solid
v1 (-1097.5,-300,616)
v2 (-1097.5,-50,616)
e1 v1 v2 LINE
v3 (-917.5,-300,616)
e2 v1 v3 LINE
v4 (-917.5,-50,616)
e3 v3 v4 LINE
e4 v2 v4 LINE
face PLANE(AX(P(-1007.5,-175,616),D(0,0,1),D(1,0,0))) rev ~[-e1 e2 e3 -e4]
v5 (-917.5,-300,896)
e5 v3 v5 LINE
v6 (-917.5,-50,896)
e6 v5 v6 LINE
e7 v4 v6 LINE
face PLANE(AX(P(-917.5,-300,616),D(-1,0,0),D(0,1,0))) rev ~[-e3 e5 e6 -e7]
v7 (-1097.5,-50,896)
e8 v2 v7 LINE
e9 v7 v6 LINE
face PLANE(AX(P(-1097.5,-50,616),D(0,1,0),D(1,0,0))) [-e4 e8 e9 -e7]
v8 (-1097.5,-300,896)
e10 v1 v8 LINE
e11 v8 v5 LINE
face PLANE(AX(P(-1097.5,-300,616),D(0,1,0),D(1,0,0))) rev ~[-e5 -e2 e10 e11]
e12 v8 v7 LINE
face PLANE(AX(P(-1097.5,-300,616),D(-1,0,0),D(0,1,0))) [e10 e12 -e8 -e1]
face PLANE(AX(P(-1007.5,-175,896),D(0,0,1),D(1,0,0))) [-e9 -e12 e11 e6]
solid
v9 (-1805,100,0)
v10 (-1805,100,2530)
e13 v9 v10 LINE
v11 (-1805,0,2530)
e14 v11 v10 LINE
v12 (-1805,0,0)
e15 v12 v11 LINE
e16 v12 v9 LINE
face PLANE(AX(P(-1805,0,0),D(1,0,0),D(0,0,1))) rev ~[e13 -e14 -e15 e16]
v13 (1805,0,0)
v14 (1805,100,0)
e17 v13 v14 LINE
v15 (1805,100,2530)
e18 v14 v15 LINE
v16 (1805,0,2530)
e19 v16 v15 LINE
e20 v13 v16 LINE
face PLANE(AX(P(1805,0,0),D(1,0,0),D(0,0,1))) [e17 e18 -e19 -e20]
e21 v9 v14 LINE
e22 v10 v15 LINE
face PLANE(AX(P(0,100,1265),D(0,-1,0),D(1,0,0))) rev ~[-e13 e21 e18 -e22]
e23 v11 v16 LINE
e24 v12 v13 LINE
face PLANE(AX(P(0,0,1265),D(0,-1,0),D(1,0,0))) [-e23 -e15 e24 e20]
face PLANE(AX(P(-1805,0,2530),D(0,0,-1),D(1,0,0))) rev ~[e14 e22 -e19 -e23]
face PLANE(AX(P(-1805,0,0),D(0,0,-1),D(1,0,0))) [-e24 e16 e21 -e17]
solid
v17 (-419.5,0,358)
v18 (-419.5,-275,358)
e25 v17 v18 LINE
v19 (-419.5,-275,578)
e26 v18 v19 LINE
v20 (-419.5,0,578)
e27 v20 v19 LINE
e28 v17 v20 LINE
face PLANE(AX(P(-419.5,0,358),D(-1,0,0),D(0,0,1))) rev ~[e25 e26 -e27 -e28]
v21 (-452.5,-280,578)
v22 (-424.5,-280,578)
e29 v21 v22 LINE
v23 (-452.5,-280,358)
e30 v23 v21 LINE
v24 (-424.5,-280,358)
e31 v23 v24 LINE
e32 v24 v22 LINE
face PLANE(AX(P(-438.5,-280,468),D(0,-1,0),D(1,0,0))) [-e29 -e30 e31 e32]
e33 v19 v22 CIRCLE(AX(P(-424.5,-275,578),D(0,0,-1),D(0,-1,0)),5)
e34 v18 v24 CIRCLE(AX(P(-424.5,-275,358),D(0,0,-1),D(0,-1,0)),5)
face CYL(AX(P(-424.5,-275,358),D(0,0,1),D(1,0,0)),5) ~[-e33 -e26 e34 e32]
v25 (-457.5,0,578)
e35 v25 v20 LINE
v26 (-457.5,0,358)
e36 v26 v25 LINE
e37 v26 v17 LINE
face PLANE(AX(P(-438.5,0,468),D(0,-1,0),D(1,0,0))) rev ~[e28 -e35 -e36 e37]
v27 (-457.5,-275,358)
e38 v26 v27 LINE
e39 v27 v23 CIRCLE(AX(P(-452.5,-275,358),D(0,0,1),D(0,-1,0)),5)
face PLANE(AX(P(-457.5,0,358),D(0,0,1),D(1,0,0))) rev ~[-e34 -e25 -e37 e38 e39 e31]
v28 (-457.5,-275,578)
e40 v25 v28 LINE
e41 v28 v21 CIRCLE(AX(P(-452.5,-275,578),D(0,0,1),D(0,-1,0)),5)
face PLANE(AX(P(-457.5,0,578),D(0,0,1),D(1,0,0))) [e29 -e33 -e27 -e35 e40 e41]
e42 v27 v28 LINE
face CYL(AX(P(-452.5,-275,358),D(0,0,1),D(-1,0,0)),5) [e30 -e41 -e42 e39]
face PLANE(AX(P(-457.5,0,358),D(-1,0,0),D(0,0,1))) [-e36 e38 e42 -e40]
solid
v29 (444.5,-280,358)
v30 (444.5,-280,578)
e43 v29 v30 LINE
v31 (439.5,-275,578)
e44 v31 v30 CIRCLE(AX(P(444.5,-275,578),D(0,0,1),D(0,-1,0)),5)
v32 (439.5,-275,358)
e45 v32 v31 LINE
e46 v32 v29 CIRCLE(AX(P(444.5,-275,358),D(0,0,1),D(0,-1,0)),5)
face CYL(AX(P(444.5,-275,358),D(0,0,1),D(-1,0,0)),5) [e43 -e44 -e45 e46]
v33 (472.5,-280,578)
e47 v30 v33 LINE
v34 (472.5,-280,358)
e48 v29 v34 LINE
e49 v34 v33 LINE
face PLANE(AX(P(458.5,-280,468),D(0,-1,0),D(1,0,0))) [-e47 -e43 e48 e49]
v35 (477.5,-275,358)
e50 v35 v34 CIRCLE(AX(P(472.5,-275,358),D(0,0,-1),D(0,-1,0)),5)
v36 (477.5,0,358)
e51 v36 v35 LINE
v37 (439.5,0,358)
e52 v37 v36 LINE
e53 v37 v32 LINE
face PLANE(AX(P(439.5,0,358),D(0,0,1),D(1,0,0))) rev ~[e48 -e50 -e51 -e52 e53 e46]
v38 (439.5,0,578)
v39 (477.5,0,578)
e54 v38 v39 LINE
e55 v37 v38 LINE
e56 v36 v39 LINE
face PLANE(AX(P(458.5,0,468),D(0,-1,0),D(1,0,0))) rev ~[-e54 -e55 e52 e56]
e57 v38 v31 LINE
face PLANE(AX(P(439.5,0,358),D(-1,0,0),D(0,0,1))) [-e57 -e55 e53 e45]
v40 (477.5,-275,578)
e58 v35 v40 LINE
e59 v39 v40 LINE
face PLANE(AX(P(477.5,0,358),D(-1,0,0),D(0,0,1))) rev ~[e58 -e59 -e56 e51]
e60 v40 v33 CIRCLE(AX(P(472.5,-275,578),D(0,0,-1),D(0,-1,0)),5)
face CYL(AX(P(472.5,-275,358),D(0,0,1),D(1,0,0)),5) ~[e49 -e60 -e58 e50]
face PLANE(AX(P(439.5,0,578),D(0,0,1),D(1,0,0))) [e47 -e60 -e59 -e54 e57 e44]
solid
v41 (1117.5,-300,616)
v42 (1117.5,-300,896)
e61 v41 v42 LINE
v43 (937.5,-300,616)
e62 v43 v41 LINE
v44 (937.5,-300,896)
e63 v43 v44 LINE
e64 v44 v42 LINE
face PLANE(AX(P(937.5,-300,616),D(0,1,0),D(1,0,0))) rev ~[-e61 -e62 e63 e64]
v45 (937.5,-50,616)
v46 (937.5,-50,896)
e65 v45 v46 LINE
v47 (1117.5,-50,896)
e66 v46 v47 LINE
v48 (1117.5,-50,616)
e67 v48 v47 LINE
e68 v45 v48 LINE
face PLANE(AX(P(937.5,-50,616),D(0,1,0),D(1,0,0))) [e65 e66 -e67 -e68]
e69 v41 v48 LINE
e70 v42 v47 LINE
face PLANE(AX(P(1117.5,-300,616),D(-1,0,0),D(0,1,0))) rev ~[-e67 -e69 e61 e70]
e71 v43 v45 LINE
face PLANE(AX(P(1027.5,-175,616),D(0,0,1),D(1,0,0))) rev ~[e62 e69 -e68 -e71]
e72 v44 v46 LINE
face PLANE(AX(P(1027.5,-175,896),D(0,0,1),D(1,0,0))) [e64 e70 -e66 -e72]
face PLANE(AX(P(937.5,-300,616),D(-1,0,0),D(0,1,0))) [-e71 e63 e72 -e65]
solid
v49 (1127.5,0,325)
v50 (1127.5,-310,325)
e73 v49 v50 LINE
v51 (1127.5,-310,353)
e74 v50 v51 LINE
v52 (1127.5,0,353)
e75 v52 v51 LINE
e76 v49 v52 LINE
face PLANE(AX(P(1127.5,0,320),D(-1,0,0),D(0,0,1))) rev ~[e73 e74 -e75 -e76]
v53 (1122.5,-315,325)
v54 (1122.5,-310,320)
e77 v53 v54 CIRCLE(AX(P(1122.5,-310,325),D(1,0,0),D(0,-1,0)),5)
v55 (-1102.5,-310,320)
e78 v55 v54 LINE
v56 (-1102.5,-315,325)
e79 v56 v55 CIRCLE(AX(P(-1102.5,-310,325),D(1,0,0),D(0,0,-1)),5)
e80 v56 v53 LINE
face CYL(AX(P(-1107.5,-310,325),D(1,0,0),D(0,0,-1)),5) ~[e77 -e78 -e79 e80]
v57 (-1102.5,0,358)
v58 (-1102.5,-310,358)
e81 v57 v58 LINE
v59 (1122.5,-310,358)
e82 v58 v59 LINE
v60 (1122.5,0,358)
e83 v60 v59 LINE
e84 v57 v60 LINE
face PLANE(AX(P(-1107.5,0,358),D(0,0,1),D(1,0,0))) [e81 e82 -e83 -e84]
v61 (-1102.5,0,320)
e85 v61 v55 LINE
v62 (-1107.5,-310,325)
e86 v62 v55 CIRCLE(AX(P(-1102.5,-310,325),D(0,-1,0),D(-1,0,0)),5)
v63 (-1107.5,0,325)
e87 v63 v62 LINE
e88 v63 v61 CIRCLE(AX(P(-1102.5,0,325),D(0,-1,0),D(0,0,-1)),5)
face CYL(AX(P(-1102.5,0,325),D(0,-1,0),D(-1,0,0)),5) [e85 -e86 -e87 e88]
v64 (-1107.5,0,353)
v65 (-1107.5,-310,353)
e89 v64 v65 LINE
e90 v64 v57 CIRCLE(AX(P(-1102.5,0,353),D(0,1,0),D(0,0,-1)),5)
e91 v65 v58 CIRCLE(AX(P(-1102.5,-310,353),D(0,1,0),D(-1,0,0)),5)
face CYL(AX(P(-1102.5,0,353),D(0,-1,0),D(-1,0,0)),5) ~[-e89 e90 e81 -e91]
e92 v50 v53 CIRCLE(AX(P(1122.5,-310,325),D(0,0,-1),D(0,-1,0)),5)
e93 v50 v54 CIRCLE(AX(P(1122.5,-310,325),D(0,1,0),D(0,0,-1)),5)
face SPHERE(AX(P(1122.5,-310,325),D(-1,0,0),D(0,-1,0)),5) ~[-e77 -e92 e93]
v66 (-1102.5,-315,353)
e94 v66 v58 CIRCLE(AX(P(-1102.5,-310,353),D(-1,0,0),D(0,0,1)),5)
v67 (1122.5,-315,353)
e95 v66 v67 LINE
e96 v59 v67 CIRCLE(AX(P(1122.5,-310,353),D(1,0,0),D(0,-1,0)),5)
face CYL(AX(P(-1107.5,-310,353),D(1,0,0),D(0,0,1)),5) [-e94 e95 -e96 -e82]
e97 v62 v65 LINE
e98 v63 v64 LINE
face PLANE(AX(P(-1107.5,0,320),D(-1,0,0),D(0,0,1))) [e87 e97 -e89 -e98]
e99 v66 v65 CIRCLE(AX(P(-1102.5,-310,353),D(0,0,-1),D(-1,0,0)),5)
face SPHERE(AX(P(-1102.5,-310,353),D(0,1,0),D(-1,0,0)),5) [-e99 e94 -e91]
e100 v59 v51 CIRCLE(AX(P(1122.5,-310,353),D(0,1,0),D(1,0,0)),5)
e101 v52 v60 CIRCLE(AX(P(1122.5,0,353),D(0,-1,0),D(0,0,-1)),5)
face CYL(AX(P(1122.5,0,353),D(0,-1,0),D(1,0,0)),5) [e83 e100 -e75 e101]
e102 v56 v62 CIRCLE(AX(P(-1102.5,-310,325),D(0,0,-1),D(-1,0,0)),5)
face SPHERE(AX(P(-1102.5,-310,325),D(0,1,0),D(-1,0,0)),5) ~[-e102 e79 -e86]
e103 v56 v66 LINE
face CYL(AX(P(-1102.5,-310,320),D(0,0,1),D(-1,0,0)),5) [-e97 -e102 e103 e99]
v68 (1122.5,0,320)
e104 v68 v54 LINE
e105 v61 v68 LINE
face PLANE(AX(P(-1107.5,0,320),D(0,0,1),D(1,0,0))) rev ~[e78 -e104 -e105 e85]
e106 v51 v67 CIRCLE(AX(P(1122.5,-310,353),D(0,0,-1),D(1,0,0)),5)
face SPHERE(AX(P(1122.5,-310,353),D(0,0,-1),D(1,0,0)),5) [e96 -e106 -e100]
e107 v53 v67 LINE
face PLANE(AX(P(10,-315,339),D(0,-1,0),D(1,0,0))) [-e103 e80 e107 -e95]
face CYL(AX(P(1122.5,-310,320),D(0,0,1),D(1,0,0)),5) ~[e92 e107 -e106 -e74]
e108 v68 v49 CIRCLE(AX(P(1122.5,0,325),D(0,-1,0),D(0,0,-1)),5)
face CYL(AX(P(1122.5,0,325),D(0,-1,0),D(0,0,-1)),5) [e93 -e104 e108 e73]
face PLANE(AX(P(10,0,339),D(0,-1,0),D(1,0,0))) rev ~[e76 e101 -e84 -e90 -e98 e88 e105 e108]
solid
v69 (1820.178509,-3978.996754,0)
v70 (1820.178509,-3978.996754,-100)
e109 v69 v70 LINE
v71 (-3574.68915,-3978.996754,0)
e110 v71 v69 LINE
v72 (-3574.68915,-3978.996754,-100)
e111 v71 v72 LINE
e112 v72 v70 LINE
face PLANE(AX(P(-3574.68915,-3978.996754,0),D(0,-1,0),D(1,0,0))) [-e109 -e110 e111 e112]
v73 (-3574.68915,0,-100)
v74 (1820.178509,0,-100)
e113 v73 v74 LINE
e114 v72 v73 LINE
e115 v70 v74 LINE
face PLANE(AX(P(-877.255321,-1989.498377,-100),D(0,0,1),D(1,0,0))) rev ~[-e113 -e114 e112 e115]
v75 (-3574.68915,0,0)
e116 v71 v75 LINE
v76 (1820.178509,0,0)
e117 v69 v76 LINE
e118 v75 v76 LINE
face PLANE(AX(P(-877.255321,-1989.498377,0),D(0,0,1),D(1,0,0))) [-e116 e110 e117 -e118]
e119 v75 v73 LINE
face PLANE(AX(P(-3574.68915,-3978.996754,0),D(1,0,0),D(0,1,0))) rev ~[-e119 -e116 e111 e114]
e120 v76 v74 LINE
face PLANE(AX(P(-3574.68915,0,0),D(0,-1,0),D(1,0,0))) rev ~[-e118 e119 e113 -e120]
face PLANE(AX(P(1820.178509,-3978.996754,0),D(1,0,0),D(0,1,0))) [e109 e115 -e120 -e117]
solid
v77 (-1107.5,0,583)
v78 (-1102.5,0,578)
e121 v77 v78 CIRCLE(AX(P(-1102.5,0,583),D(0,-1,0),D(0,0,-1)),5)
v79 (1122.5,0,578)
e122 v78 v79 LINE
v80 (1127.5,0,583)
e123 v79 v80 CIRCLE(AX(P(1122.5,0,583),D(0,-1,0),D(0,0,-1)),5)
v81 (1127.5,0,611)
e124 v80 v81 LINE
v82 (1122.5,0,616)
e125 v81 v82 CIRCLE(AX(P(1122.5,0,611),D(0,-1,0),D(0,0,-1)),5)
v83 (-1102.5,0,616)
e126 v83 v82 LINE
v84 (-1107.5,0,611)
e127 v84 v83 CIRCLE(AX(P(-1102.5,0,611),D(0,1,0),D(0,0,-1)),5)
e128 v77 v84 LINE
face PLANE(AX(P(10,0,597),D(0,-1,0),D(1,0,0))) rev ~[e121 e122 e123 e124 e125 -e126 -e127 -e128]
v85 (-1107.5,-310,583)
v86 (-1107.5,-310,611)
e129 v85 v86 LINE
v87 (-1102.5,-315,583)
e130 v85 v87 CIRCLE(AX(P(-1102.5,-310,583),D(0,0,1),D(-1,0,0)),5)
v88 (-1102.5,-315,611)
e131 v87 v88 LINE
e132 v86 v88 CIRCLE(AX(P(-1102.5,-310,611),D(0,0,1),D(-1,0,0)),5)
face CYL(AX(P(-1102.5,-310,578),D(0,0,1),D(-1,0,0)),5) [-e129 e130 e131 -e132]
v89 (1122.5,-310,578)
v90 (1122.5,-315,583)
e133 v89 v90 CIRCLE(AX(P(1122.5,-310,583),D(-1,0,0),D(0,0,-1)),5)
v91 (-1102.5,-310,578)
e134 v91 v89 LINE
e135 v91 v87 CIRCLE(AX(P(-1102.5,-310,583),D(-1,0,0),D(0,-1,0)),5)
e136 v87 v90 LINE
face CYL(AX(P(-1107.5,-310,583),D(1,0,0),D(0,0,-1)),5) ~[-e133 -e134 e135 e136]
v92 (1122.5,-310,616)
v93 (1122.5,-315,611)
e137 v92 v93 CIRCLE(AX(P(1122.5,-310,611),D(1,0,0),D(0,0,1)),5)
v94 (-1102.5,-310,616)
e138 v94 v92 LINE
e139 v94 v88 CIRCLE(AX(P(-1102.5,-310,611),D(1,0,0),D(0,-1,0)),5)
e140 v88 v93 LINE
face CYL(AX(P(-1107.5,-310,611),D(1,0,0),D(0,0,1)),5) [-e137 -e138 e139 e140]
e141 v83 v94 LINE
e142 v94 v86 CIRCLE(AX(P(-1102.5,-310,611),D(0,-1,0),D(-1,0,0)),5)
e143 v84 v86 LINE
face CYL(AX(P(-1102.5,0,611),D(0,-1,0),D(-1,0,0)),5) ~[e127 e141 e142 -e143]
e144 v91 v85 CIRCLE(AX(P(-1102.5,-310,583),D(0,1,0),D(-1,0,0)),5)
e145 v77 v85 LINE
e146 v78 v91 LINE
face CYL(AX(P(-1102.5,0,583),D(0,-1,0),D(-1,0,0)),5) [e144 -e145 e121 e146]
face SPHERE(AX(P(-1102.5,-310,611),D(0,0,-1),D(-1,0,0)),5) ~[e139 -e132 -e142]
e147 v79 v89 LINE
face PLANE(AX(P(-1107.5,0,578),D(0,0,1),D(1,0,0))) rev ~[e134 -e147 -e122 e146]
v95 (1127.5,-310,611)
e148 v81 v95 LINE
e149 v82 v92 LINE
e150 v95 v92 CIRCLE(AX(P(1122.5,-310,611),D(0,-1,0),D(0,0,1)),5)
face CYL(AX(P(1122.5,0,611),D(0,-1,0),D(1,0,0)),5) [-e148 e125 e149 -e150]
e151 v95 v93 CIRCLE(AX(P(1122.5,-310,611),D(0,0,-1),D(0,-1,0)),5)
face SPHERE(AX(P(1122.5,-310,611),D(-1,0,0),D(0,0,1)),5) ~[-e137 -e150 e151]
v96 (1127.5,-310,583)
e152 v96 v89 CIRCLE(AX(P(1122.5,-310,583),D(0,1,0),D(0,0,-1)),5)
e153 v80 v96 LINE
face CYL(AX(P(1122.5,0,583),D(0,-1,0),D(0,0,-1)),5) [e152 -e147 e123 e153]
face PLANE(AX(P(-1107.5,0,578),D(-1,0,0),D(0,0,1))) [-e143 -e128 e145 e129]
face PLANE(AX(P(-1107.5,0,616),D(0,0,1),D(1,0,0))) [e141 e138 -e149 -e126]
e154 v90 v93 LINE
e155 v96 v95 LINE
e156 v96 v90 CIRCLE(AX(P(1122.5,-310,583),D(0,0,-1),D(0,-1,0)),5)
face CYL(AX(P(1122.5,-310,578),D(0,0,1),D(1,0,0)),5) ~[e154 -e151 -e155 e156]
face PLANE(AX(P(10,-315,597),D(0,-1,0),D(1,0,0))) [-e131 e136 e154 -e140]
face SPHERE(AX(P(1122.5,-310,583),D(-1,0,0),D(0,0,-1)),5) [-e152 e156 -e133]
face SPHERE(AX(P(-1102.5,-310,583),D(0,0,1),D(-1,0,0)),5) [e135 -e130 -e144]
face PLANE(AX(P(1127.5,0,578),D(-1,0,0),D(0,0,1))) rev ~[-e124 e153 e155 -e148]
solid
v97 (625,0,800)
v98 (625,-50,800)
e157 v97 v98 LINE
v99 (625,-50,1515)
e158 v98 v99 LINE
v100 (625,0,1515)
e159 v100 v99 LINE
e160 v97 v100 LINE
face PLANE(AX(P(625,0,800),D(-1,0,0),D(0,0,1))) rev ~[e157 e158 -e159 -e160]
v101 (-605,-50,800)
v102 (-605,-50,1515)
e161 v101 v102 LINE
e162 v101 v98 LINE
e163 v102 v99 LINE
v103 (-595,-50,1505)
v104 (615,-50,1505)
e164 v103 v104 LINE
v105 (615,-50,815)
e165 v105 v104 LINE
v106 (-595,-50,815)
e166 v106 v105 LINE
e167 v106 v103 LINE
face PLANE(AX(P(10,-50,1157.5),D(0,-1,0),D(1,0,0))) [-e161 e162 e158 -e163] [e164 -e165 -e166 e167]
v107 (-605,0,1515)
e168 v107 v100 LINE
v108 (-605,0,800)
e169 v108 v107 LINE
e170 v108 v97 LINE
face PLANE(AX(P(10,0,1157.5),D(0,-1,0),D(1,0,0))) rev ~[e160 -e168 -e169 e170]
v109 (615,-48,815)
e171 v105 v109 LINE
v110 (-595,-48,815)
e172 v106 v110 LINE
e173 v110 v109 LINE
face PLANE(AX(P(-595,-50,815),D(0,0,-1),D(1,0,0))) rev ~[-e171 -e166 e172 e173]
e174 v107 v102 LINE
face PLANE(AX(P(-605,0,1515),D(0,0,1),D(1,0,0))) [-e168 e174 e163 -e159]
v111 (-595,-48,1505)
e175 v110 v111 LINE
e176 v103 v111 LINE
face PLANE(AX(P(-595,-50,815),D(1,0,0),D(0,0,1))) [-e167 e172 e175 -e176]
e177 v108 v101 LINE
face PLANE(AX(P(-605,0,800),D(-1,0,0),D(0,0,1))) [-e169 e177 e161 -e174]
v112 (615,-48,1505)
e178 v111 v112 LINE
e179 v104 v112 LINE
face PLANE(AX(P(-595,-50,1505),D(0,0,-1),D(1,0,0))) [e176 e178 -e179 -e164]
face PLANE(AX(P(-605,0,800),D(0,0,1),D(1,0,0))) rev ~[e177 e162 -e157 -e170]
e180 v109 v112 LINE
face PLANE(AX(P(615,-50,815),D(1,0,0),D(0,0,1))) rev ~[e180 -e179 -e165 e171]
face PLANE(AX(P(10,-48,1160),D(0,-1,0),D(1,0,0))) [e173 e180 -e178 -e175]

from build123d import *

# Parameters (mm, degrees)
F0_W      = 3610
F0_H      = 2530
F1_DEPTH  = 100
F2_W      = 5394.8676586151
F2_H      = 3978.9967536926
F3_DEPTH  = 100
F4_W      = 1230
F4_H      = 715
F5_DEPTH  = 50
F6_W      = 1210
F6_H      = 690
F7_DEPTH  = 2
F8_W      = 2235
F8_H      = 38
F9_DEPTH  = 315
F10_W     = 38
F10_H     = 220
F11_DEPTH = 280
F12_R     = 5
F12_2_R   = 5
F13_R     = 5
F13_2_R   = 5
F14_W     = 180
F14_H     = 250
F15_DEPTH = 280


with BuildPart() as f1:
    # F0 (on Front) → F1 (new body)
    with BuildSketch(Plane.XZ):
        with Locations((0, 1265)):
            Rectangle(F0_W, F0_H)
    extrude(amount=-F1_DEPTH)


with BuildPart() as f3:
    # F2 (on Top) → F3 (new body)
    with BuildSketch(Plane.XY):
        with Locations((-877.255320549, -1989.4983768463)):
            Rectangle(F2_W, F2_H)
    extrude(amount=-F3_DEPTH)


with BuildPart() as f5:
    # F4 (on face) → F5 (new body)
    with BuildSketch(Plane.XZ):
        with Locations((10, 1157.5)):
            Rectangle(F4_W, F4_H)
    extrude(amount=F5_DEPTH)

    # F6 (on face) → F7 (cut)
    with BuildSketch(Plane.XZ.offset(50)):
        with Locations((10, 1160)):
            Rectangle(F6_W, F6_H)
    extrude(amount=-F7_DEPTH, mode=Mode.SUBTRACT)


with BuildPart() as f9:
    # F8 (on face) → F9 (new body)
    with BuildSketch(Plane.XZ):
        with Locations((10, 597)):
            Rectangle(F8_W, F8_H)
    extrude(amount=F9_DEPTH)

    # F12
    f12_edges = [f9.edges().sort_by_distance(p)[0] for p in [
        (-1107.5, -315, 597),
        (-1107.5, -157.5, 616),
        (-1107.5, -157.5, 578),
        (10, -315, 578),
        (10, -315, 616),
        (1127.5, -157.5, 616),
        (1127.5, -157.5, 578),
        (1127.5, -315, 597),
    ]]
    fillet(f12_edges, radius=F12_R)


with BuildPart() as f9b:
    # F8 (on face) → F9, piece 2 (new body)
    with BuildSketch(Plane.XZ):
        with Locations((10, 339)):
            Rectangle(F8_W, F8_H)
    extrude(amount=F9_DEPTH)

    # F12#2
    f12_2_edges = [f9b.edges().sort_by_distance(p)[0] for p in [
        (-1107.5, -157.5, 358),
        (-1107.5, -157.5, 320),
        (-1107.5, -315, 339),
        (10, -315, 320),
        (1127.5, -315, 339),
        (1127.5, -157.5, 320),
        (1127.5, -157.5, 358),
        (10, -315, 358),
    ]]
    fillet(f12_2_edges, radius=F12_2_R)


with BuildPart() as f11:
    # F10 (on face) → F11 (new body)
    with BuildSketch(Plane.XZ):
        with Locations((-438.5, 468)):
            Rectangle(F10_W, F10_H)
    extrude(amount=F11_DEPTH)

    # F13
    f13_edges = [f11.edges().sort_by_distance(p)[0] for p in [
        (-457.5, -280, 468),
        (-419.5, -280, 468),
    ]]
    fillet(f13_edges, radius=F13_R)


with BuildPart() as f11b:
    # F10 (on face) → F11, piece 2 (new body)
    with BuildSketch(Plane.XZ):
        with Locations((458.5, 468)):
            Rectangle(F10_W, F10_H)
    extrude(amount=F11_DEPTH)

    # F13#2
    f13_2_edges = [f11b.edges().sort_by_distance(p)[0] for p in [
        (439.5, -280, 468),
        (477.5, -280, 468),
    ]]
    fillet(f13_2_edges, radius=F13_2_R)


with BuildPart() as f15:
    # F14 (on face) → F15 (new body)
    with BuildSketch(Plane.XY.offset(616)):
        with Locations((-1007.5, -175)):
            Rectangle(F14_W, F14_H)
    extrude(amount=F15_DEPTH)


with BuildPart() as f15b:
    # F14 (on face) → F15, piece 2 (new body)
    with BuildSketch(Plane.XY.offset(616)):
        with Locations((1027.5, -175)):
            Rectangle(F14_W, F14_H)
    extrude(amount=F15_DEPTH)


solid = Compound([f1.part, f3.part, f5.part, f9.part, f9b.part, f11.part, f11b.part, f15.part, f15b.part])
